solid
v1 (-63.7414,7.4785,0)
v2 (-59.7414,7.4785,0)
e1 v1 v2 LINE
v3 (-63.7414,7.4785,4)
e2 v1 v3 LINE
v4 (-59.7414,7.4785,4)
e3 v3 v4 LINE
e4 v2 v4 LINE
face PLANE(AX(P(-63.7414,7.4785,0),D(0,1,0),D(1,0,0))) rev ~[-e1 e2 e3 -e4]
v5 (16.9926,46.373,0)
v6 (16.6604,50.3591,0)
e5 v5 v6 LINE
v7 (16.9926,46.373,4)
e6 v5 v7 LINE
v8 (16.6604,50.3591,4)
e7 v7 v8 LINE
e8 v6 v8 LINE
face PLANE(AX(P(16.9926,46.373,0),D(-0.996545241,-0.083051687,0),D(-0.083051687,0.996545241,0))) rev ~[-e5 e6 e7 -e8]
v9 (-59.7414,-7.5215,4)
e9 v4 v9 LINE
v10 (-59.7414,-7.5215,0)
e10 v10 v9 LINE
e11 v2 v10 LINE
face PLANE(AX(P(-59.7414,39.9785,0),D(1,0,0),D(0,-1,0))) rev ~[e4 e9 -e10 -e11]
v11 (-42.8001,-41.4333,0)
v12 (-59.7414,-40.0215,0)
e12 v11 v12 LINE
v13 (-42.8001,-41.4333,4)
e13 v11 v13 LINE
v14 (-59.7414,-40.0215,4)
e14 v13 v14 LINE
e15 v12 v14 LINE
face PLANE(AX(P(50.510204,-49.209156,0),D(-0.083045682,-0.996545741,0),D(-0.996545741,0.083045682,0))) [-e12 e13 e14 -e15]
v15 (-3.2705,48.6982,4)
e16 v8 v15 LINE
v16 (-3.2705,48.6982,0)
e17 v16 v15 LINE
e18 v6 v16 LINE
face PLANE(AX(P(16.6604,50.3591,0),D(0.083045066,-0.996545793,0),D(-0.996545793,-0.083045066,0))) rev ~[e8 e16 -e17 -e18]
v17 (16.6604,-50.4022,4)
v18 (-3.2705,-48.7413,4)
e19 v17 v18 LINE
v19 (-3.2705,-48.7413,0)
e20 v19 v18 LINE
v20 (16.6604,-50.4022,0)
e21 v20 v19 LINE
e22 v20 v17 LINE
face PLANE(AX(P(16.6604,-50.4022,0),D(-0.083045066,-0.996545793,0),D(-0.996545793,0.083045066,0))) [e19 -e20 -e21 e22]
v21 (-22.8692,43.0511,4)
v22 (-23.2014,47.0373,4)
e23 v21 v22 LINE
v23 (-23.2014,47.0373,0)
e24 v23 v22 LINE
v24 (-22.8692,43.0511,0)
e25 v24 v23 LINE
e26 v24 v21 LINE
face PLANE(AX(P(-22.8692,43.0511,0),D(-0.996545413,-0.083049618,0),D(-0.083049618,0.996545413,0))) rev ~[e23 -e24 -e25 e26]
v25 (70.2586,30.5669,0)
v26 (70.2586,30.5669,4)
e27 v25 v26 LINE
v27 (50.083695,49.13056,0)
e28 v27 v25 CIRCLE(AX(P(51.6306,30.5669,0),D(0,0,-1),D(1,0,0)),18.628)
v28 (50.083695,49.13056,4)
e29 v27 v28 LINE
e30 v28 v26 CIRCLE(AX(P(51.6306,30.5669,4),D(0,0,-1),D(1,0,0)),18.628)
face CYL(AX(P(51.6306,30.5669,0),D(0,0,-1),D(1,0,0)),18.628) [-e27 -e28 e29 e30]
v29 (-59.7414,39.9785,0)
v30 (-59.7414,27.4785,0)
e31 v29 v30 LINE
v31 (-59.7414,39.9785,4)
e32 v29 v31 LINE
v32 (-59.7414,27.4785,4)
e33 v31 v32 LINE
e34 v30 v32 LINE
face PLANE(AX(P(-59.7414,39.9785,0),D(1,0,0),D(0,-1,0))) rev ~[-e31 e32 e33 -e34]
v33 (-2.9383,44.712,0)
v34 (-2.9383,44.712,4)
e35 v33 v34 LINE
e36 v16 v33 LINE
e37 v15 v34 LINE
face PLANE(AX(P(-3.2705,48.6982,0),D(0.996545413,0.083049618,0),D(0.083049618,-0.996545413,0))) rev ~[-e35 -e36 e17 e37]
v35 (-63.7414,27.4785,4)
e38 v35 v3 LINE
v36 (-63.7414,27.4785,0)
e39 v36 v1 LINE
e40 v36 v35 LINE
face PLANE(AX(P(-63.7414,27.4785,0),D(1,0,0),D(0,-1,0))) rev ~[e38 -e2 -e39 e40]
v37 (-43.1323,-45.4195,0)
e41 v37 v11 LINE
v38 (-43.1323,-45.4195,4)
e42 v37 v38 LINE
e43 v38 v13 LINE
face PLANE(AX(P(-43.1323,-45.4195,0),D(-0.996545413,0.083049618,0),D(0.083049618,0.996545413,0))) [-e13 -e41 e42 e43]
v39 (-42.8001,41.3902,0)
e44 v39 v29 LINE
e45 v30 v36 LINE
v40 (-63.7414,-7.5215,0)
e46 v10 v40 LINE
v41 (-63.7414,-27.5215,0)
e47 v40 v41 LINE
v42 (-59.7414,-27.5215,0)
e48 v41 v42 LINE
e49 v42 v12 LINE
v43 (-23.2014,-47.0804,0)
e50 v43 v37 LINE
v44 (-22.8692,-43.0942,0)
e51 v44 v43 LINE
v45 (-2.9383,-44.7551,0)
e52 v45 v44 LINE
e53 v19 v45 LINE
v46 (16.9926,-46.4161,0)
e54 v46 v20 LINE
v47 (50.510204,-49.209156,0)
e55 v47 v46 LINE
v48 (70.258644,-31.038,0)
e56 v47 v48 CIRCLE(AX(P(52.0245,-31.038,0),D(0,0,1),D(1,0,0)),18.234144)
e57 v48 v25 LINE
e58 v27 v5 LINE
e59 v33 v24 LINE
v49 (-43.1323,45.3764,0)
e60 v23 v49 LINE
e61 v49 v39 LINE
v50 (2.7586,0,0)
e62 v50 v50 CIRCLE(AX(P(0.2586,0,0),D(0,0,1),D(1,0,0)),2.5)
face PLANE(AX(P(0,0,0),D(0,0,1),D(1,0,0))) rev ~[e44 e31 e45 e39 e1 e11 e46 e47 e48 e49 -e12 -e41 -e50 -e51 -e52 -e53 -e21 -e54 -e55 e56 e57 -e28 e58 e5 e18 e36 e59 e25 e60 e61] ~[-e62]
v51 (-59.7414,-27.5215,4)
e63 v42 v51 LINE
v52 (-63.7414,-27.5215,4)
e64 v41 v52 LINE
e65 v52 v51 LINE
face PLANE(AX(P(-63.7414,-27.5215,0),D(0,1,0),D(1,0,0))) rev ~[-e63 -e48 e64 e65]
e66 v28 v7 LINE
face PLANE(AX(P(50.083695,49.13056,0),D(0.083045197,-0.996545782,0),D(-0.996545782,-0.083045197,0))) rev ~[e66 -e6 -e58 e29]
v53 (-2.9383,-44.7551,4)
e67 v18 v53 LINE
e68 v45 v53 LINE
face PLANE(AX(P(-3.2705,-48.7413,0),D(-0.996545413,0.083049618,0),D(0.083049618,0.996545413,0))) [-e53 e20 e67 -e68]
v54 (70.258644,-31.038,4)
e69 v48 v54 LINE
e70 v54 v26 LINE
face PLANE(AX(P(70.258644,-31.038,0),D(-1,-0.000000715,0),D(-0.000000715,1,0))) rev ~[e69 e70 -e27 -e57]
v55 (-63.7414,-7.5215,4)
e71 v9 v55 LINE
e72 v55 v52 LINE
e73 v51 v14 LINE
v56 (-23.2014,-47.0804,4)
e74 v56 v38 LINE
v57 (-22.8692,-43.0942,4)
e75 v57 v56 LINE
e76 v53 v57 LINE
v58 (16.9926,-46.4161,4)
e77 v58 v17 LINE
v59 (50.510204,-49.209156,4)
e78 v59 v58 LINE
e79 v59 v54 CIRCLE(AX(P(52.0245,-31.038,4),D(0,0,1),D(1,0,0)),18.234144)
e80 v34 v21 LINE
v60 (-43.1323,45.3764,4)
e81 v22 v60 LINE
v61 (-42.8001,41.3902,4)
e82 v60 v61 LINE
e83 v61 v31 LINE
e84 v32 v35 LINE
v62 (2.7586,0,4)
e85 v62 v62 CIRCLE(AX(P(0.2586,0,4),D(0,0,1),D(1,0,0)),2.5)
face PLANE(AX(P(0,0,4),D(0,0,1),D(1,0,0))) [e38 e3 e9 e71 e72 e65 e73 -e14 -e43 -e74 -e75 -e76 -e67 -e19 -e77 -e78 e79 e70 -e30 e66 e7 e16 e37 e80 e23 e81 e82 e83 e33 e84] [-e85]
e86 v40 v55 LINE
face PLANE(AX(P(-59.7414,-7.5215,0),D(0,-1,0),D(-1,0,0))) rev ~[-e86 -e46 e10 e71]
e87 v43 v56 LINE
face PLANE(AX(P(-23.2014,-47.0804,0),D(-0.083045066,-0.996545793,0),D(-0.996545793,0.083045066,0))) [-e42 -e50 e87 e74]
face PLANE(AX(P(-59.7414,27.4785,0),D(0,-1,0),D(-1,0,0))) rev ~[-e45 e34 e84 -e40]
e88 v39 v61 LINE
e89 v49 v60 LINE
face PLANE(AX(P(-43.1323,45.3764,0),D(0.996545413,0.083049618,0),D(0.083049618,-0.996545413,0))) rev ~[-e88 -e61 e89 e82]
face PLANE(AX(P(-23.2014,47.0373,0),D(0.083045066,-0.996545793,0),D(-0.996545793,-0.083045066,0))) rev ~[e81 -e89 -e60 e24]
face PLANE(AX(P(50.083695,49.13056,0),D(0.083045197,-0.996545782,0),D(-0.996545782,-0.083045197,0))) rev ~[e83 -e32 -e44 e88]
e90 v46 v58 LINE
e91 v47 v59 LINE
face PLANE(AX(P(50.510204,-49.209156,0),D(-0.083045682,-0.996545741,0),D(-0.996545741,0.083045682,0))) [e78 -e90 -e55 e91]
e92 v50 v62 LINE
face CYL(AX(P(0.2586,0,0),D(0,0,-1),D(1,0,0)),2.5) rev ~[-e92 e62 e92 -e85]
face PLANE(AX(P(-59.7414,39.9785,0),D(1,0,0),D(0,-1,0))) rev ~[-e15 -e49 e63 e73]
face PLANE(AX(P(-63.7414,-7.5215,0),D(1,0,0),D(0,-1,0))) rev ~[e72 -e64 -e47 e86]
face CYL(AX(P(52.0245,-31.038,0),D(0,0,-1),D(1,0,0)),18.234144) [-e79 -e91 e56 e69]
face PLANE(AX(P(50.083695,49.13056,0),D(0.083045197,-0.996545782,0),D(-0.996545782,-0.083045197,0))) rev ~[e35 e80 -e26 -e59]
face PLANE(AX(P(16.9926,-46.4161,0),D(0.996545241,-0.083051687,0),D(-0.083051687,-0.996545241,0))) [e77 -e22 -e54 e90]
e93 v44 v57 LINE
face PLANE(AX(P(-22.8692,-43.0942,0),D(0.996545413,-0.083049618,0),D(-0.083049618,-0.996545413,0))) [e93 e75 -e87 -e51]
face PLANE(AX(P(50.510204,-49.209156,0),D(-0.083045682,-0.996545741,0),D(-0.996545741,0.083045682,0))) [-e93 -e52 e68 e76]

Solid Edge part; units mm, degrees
sketch "Sketch1" plane through (0, 0, 0) normal (0, 0, 1) x (1, 0, 0)
  line L0 (50.5102, -49.2092) -> (-59.7414, -40.0215)
  line L1 (-59.7414, 39.9785) -> (-59.7414, -40.0215)
  line L2 (50.0837, 49.1305) -> (-59.7414, 39.9785)
  arc A0 (50.0837, 49.1305) -> (70.2586, 30.5669) centre (51.6306, 30.5669) cw
  line L3 (70.2586, -31.038) -> (70.2586, 30.5669)
  arc A1 (50.5102, -49.2092) -> (70.2586, -31.038) centre (52.0245, -31.038) ccw
  line L4 (16.6604, -50.4022) -> (-3.2705, -48.7413)
  line L5 (-3.2705, -48.7413) -> (-2.9383, -44.7551)
  line L6 (-2.9383, -44.7551) -> (16.9926, -46.4161)
  line L7 (16.9926, -46.4161) -> (16.6604, -50.4022)
  line L8 (-23.2014, -47.0804) -> (-43.1323, -45.4195)
  line L9 (-43.1323, -45.4195) -> (-42.8001, -41.4333)
  line L10 (-42.8001, -41.4333) -> (-22.8692, -43.0942)
  line L11 (-22.8692, -43.0942) -> (-23.2014, -47.0804)
  line L12 (-42.8001, 41.3902) -> (-22.8692, 43.0511)
  line L13 (-22.8692, 43.0511) -> (-23.2014, 47.0373)
  line L14 (-23.2014, 47.0373) -> (-43.1323, 45.3764)
  line L15 (-43.1323, 45.3764) -> (-42.8001, 41.3902)
  line L16 (16.6604, 50.3591) -> (-3.2705, 48.6982)
  line L17 (-3.2705, 48.6982) -> (-2.9383, 44.712)
  line L18 (-2.9383, 44.712) -> (16.9926, 46.373)
  line L19 (16.9926, 46.373) -> (16.6604, 50.3591)
  line L20 (-63.7414, 27.4785) -> (-63.7414, 7.4785)
  line L21 (-63.7414, 7.4785) -> (-59.7414, 7.4785)
  line L22 (-59.7414, 7.4785) -> (-59.7414, 27.4785)
  line L23 (-59.7414, 27.4785) -> (-63.7414, 27.4785)
  line L24 (-59.7414, -27.5215) -> (-59.7414, -7.5215)
  line L25 (-59.7414, -7.5215) -> (-63.7414, -7.5215)
  line L26 (-63.7414, -7.5215) -> (-63.7414, -27.5215)
  line L27 (-63.7414, -27.5215) -> (-59.7414, -27.5215)
  circle A2 centre (0.2586, 0) radius 2.5
  dimension "D1" = 130
  dimension "D2" = 20
  dimension "D3" = 20
  dimension "D4" = 4
  dimension "D5" = 4
  dimension "D6" = 20
  dimension "D7" = 4
  dimension "D8" = 4
  dimension "D9" = 20
  dimension "D10" = 17
  dimension "D11" = 17
  dimension "D12" = 20
  dimension "D13" = 20
  dimension "D14" = 80
  dimension "D15" = 20
  dimension "D16" = 4
  dimension "D17" = 20
  dimension "D18" = 4
  dimension "D19" = 15
  dimension "D20" = 12.5
  dimension "D21" = 12.5
  dimension "D22" = 5
  dimension "D23" = 60
  dimension "D24" = 61.605
extrude "Protrusion1" add sketch "Sketch1" along normal blind 4
